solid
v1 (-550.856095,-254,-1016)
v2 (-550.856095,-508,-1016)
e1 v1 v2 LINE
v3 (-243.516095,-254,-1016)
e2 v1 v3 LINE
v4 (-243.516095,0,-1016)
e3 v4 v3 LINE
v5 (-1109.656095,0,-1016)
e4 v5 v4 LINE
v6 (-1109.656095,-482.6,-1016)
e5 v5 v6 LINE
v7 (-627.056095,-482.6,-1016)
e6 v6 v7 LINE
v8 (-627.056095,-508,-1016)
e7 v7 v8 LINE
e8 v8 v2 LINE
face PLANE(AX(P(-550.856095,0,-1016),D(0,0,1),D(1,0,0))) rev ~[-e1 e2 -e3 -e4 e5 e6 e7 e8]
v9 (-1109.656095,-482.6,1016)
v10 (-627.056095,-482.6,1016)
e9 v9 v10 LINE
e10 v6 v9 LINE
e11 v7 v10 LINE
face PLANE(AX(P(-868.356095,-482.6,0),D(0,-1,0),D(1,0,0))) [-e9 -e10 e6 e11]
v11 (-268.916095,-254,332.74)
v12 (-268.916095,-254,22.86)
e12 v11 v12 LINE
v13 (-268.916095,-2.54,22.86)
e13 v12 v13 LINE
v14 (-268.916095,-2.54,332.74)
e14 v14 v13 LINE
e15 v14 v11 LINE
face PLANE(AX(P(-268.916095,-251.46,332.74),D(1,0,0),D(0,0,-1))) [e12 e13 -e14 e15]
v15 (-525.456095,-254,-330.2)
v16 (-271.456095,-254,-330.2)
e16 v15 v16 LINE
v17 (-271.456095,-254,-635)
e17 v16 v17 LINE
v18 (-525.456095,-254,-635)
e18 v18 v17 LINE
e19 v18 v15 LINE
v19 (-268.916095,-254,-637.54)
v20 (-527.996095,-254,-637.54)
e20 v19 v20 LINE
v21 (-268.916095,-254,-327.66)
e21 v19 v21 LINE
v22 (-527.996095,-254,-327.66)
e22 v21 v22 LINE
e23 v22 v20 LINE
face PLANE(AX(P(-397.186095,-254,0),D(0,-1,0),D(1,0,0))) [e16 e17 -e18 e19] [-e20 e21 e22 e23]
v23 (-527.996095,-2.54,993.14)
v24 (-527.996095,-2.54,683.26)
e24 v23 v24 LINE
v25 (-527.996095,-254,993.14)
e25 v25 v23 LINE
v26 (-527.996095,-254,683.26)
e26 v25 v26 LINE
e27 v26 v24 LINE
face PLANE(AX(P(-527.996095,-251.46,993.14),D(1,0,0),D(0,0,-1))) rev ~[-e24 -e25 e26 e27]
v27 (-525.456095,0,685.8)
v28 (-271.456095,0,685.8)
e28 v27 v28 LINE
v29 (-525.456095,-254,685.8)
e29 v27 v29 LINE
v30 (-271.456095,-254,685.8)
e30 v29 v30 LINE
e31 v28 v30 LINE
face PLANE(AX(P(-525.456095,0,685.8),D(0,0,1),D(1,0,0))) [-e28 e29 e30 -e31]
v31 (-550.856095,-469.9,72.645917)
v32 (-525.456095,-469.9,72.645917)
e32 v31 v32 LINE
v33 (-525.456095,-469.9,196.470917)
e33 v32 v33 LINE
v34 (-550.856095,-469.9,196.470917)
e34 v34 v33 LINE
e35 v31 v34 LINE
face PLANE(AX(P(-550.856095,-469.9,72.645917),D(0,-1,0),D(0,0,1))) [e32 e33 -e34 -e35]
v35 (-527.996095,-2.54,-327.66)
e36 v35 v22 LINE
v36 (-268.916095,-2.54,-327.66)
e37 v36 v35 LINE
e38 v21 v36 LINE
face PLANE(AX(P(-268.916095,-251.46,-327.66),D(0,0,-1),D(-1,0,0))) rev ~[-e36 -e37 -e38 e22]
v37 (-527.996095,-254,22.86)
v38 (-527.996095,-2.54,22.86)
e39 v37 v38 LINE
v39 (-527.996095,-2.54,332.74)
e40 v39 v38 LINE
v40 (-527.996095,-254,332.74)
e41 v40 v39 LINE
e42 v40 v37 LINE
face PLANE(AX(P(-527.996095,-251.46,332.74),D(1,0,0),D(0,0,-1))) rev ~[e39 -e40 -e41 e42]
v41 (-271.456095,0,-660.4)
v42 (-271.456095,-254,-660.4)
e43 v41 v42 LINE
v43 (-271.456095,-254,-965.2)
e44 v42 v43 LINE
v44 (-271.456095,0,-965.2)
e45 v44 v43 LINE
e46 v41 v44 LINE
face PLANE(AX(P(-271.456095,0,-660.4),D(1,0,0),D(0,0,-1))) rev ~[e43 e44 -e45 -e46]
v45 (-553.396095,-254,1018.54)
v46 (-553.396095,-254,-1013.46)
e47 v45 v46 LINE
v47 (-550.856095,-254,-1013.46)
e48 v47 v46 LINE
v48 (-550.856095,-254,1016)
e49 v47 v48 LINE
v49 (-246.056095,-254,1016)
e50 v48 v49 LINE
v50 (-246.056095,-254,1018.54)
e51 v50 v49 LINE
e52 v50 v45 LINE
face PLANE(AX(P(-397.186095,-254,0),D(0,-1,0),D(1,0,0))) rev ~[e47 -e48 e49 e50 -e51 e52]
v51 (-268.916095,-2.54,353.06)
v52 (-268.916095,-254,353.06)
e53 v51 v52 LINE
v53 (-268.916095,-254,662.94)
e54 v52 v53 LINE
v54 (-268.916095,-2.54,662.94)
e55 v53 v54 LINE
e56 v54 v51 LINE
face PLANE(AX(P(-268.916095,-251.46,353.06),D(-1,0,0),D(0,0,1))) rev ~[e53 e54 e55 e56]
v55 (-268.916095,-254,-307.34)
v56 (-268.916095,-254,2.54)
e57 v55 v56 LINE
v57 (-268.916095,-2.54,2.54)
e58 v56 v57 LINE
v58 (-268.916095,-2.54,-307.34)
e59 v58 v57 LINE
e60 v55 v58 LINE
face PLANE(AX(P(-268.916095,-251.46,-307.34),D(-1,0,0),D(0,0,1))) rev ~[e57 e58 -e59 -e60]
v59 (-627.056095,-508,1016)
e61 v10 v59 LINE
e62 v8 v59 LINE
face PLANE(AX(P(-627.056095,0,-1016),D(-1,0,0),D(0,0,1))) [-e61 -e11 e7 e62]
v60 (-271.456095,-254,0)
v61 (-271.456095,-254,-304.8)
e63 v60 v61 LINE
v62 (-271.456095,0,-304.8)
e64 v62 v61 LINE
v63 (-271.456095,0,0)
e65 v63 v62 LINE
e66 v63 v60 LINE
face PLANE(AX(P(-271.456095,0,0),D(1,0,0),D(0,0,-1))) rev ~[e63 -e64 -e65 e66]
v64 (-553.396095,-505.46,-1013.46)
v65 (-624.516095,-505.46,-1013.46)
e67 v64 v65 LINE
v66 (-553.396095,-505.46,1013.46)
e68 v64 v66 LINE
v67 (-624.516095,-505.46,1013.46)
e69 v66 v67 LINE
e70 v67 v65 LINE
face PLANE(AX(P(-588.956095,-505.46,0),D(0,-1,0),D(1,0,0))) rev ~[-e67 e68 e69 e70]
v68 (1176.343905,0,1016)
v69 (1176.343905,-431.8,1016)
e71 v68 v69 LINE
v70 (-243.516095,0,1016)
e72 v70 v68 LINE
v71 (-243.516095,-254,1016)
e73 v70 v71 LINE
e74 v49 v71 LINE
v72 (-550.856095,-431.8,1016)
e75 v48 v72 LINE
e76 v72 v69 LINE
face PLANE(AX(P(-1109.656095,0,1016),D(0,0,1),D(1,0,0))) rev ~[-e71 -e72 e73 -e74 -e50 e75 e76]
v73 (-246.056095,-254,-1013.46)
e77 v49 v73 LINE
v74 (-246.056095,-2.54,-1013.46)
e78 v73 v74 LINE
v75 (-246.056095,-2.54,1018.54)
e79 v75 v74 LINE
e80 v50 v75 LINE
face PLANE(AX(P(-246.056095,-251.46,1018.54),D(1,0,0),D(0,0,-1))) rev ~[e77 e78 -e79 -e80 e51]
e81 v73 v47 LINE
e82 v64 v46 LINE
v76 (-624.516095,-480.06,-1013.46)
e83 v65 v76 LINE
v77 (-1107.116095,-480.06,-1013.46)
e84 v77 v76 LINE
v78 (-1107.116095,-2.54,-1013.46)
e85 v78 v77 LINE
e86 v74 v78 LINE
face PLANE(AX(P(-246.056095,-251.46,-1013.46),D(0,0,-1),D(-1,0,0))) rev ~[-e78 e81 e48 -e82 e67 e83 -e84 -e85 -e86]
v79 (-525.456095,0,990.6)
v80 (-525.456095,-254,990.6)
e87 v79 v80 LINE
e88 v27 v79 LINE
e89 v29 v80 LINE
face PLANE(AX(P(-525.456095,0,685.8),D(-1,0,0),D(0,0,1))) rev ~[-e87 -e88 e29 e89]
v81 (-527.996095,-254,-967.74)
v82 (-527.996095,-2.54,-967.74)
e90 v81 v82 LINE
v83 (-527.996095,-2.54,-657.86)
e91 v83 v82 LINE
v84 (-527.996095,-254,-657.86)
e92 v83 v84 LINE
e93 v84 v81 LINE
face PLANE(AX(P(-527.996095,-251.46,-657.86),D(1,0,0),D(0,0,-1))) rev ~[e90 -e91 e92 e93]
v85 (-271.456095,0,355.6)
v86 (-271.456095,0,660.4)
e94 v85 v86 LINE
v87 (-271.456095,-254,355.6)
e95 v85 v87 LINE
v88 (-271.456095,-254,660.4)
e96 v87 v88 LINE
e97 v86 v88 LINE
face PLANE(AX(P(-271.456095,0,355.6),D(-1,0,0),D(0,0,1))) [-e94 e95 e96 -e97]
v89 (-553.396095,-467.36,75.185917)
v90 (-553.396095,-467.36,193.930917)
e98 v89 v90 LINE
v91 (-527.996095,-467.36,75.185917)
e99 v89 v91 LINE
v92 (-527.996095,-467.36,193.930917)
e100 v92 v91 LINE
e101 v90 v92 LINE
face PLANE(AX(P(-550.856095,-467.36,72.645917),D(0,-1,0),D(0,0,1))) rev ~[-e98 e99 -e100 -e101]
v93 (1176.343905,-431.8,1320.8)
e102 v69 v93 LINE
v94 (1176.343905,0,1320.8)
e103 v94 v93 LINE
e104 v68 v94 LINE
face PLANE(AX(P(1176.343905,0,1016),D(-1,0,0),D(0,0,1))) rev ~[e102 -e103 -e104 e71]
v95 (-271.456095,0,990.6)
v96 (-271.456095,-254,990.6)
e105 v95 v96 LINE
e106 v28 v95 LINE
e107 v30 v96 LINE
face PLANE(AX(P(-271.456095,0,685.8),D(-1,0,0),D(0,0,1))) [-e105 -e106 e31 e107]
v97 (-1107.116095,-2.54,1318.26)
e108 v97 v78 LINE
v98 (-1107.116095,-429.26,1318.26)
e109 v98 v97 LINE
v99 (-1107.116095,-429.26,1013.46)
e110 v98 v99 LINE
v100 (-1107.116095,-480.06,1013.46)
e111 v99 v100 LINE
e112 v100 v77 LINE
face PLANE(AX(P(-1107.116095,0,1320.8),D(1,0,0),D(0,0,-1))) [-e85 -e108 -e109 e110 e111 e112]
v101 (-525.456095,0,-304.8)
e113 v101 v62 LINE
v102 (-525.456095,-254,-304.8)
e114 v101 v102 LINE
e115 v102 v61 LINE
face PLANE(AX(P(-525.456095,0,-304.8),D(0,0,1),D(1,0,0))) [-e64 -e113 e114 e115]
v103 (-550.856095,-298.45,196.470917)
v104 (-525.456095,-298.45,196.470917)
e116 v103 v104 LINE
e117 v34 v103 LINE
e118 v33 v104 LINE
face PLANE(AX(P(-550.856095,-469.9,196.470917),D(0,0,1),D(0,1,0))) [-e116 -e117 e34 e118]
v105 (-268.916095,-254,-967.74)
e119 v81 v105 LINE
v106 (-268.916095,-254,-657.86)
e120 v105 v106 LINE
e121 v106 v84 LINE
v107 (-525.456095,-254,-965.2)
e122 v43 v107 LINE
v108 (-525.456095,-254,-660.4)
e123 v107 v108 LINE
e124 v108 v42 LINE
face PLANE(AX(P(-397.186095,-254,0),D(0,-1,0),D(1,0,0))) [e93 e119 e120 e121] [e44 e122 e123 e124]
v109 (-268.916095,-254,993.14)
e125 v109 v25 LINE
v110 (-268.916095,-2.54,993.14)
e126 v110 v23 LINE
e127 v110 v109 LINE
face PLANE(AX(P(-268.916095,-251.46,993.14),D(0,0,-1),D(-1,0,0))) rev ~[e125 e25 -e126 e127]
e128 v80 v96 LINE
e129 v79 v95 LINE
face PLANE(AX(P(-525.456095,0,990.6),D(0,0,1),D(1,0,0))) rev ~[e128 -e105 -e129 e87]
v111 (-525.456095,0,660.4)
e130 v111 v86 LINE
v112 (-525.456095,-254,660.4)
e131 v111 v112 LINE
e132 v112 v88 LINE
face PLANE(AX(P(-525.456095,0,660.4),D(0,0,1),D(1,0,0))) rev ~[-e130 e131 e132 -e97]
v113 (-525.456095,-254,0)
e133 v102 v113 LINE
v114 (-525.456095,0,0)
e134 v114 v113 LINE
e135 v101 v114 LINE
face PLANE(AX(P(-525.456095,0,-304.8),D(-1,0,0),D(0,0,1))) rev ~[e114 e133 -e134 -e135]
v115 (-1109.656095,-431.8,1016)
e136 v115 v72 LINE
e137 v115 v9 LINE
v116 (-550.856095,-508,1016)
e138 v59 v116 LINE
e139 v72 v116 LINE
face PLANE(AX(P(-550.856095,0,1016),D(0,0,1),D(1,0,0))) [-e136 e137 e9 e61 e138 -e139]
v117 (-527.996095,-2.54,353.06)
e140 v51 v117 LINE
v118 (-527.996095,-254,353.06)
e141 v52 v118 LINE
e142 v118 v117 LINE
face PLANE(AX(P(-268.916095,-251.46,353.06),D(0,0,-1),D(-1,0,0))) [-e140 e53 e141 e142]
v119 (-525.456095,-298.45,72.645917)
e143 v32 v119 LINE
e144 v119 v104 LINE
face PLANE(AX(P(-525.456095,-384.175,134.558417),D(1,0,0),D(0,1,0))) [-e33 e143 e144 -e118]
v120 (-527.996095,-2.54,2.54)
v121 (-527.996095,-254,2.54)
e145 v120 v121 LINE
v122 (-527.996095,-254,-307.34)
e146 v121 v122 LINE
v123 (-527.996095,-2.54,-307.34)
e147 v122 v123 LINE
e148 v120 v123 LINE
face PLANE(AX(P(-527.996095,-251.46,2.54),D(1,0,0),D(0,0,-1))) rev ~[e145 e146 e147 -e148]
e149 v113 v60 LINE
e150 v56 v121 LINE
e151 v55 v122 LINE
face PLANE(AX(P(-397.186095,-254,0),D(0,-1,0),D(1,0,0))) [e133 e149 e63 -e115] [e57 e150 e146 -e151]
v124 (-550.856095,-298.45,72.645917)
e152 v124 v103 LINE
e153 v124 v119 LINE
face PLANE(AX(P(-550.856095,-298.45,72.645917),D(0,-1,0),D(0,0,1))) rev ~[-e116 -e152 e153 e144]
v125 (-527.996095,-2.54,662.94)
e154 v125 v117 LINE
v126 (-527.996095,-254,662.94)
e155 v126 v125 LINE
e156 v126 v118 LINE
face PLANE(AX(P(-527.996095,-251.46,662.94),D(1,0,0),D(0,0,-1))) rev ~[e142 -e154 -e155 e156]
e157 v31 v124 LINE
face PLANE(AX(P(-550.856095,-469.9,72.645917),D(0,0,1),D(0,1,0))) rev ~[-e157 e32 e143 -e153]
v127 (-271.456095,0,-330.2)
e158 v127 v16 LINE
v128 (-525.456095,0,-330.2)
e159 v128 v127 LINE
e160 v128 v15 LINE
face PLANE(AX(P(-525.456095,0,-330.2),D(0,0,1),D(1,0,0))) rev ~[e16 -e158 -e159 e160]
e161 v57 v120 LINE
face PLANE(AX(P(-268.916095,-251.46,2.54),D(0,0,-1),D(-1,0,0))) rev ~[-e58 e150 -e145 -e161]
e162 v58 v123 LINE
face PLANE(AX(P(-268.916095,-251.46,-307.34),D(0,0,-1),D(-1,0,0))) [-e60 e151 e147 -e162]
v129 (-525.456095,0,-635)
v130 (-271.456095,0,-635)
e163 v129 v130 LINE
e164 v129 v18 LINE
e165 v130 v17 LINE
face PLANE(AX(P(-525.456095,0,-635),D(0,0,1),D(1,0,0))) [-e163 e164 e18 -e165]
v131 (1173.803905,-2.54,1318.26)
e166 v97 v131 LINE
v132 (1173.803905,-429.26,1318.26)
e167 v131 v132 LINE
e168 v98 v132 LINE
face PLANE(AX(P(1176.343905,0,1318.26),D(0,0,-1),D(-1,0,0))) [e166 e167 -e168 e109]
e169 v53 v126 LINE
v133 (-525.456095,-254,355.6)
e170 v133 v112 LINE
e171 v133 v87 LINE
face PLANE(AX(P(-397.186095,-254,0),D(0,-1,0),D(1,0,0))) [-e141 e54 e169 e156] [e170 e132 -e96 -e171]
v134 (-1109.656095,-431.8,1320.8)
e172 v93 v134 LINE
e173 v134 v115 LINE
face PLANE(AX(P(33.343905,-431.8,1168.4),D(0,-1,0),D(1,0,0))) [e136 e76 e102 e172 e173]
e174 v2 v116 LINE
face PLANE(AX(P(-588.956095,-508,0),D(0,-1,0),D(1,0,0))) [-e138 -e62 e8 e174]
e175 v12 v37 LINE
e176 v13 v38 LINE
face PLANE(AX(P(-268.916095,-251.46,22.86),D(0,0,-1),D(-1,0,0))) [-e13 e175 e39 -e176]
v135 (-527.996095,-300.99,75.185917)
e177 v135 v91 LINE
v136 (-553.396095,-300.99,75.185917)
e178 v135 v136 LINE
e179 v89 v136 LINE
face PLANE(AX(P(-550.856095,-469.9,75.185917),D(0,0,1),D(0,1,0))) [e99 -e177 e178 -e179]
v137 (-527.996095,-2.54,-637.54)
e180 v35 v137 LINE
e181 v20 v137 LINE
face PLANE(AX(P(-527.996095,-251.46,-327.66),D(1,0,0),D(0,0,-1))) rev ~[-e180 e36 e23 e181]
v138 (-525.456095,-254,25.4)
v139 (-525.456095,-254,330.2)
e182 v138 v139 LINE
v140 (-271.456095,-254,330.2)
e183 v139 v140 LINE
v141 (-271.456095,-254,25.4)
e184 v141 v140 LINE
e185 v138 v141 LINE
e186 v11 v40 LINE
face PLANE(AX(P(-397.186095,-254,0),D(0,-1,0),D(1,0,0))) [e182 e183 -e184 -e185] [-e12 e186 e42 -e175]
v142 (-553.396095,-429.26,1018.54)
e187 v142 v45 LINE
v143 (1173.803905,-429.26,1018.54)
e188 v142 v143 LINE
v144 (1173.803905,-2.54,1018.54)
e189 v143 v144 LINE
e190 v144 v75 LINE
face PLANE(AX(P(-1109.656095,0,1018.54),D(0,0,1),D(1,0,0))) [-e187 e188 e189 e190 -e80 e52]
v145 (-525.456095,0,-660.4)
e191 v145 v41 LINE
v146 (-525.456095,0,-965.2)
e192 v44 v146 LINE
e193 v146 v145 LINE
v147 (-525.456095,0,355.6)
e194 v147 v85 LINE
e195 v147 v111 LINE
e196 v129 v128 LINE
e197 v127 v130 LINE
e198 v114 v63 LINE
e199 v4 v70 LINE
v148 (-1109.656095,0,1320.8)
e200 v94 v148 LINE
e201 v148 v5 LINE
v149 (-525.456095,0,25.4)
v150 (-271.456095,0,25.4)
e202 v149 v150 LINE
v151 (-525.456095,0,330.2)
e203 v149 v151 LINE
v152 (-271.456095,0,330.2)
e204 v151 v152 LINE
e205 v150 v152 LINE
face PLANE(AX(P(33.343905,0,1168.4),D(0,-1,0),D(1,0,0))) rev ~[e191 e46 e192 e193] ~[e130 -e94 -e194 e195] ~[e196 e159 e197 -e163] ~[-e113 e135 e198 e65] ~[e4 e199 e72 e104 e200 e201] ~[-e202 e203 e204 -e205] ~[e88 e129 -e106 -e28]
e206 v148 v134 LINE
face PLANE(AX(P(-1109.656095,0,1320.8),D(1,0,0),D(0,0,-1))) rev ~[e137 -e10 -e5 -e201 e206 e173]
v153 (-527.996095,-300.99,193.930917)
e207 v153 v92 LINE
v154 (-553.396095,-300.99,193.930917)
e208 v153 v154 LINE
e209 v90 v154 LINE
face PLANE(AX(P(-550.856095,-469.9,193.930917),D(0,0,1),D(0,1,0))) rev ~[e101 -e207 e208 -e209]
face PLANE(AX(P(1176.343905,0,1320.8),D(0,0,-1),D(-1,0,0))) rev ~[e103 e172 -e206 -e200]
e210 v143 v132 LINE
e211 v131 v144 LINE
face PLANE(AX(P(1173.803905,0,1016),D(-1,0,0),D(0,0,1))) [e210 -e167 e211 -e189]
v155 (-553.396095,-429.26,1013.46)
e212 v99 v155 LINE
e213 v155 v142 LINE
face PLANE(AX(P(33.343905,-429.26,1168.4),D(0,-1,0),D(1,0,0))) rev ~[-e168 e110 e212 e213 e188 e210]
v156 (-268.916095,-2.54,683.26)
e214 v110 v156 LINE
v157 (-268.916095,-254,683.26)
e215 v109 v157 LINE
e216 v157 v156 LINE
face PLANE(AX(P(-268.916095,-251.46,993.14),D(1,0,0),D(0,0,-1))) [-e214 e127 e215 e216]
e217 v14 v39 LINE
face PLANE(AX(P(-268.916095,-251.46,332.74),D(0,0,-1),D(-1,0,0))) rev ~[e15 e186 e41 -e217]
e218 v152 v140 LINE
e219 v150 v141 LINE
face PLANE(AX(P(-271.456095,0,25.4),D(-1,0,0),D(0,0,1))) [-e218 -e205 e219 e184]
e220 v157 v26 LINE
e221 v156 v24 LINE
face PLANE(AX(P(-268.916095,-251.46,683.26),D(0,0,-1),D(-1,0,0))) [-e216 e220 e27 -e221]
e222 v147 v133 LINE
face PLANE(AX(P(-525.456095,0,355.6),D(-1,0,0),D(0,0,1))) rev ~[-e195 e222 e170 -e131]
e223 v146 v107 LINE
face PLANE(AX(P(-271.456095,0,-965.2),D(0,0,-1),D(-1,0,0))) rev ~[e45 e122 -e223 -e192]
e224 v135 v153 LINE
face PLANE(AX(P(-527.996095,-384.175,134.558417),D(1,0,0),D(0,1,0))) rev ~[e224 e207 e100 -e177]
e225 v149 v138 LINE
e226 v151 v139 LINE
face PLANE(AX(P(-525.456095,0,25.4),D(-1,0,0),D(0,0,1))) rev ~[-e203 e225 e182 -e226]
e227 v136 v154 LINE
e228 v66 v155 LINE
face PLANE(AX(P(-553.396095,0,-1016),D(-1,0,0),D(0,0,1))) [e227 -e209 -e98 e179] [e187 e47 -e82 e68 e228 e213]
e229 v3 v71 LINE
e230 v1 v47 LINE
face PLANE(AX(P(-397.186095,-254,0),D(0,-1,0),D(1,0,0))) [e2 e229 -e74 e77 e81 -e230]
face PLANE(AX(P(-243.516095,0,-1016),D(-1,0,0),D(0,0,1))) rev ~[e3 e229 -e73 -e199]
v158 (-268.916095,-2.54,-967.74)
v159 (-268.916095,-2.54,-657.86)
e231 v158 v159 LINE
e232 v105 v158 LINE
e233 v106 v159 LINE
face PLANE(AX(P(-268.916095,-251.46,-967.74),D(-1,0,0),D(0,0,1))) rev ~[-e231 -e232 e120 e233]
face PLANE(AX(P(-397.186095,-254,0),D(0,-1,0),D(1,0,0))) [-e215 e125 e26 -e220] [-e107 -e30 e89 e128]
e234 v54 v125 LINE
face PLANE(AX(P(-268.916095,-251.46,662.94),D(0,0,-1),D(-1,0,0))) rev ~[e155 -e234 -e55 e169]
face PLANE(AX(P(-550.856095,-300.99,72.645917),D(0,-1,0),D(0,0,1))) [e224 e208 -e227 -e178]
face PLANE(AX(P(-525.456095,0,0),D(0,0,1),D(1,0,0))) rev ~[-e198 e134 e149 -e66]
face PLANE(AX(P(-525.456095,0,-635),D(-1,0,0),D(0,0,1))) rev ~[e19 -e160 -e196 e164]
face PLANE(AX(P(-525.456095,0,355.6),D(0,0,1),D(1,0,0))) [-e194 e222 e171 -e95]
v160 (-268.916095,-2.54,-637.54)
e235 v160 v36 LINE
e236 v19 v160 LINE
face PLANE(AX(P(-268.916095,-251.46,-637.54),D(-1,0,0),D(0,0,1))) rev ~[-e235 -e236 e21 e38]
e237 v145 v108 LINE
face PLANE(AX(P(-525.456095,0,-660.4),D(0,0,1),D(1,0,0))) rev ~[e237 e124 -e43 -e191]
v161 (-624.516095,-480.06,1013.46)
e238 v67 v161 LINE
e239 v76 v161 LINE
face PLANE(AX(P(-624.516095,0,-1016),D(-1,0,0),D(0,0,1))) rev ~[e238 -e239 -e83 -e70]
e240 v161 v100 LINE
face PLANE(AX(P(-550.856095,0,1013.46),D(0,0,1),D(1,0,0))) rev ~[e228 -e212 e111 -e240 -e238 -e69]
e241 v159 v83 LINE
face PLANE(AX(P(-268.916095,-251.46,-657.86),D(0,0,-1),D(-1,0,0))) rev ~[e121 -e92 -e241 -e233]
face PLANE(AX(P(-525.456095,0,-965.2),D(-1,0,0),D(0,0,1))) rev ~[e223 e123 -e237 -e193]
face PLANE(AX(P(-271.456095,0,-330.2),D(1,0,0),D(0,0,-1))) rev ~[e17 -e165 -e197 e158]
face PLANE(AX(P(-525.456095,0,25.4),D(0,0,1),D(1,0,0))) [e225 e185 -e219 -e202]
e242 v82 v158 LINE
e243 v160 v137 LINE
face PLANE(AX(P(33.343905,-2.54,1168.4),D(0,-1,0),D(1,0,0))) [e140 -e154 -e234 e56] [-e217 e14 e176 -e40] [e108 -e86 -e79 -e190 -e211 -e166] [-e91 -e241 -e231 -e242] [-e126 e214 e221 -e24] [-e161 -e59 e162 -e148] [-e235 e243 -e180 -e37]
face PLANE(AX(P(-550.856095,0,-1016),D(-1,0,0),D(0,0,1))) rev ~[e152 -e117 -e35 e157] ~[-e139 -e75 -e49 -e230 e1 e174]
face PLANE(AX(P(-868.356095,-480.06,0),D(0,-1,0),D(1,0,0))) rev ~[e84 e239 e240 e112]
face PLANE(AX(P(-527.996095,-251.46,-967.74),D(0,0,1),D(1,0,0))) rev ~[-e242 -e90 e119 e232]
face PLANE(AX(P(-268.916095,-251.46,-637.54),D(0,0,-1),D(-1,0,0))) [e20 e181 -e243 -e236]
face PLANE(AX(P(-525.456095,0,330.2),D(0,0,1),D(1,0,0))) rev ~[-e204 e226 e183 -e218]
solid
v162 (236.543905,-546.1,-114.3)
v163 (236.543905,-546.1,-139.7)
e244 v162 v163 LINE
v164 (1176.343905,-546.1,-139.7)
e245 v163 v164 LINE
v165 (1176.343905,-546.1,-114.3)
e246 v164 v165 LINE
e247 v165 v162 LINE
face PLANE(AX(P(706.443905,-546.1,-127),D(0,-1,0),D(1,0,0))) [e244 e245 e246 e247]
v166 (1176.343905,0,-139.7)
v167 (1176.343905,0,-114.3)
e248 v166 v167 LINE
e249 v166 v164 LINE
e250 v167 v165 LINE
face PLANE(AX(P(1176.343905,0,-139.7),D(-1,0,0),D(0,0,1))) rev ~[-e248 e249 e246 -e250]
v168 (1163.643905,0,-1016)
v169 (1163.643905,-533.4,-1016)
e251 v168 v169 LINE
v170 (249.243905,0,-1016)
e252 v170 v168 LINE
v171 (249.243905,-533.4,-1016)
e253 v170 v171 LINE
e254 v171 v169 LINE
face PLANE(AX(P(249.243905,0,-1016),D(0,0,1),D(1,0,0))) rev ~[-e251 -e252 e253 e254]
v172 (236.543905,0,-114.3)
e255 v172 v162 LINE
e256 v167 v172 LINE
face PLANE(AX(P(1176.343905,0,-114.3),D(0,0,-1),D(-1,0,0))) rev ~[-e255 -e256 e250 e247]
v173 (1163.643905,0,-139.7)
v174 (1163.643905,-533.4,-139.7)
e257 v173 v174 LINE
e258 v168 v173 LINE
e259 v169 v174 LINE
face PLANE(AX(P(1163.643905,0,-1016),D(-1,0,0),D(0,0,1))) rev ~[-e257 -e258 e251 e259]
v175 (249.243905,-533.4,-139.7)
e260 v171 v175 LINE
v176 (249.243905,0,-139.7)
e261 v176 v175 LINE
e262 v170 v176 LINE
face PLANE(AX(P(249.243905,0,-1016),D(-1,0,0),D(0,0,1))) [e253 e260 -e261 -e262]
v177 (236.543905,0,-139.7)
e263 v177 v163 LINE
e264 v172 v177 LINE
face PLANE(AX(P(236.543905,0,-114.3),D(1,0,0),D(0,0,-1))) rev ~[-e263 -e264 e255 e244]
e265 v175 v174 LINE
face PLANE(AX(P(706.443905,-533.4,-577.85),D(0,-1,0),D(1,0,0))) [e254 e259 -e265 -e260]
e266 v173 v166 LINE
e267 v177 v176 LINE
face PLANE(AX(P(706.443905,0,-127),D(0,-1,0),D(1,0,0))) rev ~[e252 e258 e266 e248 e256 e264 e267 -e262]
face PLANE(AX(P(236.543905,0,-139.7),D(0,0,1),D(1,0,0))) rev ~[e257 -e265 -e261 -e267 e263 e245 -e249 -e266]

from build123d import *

# Parameters (mm, degrees)
F1_DEPTH = 546.1
F0_W     = 914.4
F0_H     = 876.3
F2_DEPTH = 533.4
F0_W_2   = 482.6
F0_H_2   = 2032
F3_DEPTH = 482.6
F0_W_3   = 76.2
F4_DEPTH = 508
F5_W     = 171.45
F5_H     = 123.825
F6_DEPTH = 25.4
F0_W_4   = 307.34
F0_W_5   = 254
F0_H_3   = 304.8
F0_H_4   = 25.4
F7_DEPTH = 254
F8_DEPTH = 431.8
F9_T     = -2.54


# Not quite as in the source:
# - a shell that OpenCascade refuses in one call is made with other operations: the cavity is built on its own and cut out
# - the program builds the solid bodies; features that only make, move or delete a surface that nothing else refers to are left out


with BuildPart() as f1:
    # F0 (on Front) → F1 (new body)
    with BuildSketch(Plane.XZ):
        Polygon((236.5439048201, -139.7), (249.2439048201, -139.7), (1163.6439048201, -139.7), (1176.3439048201, -139.7), (1176.3439048201, -114.3), (236.5439048201, -114.3), align=None)
    extrude(amount=F1_DEPTH)

    # F0 (on Front) → F2 (join)
    with BuildSketch(Plane.XZ):
        with Locations((706.4439048201, -577.85)):
            Rectangle(F0_W, F0_H)
    extrude(amount=F2_DEPTH)


with BuildPart() as f3:
    # F0 (on Front) → F3 (new body)
    with BuildSketch(Plane.XZ):
        with Locations((-868.3560951799, 0)):
            Rectangle(F0_W_2, F0_H_2)
    extrude(amount=F3_DEPTH)

    # F0 (on Front) → F4 (join)
    with BuildSketch(Plane.XZ):
        with Locations((-588.9560951799, 0)):
            Rectangle(F0_W_3, F0_H_2)
    extrude(amount=F4_DEPTH)

    # F5 (on face) → F6 (join)
    with BuildSketch(Plane.YZ.offset(-550.8560951799)):
        with Locations((-384.175, 134.5584170843)):
            Rectangle(F5_W, F5_H)
    extrude(amount=F6_DEPTH)

    # F0 (on Front) → F7 (join)
    with BuildSketch(Plane.XZ):
        with Locations((-397.1860951799, 0)):
            Rectangle(F0_W_4, F0_H_2)
        Polygon((-525.4560951799, -304.8), (-525.4560951799, 0), (-271.4560951799, 0), (-271.4560951799, -304.8), (-271.4560951799, -330.2), (-271.4560951799, -635), (-271.4560951799, -660.4), (-271.4560951799, -965.2), (-525.4560951799, -965.2), (-525.4560951799, -660.4), (-525.4560951799, -635), (-525.4560951799, -330.2), align=None, mode=Mode.SUBTRACT)
        with Locations((-398.4560951799, 177.8)):
            Rectangle(F0_W_5, F0_H_3, mode=Mode.SUBTRACT)
        with Locations((-398.4560951799, 508)):
            Rectangle(F0_W_5, F0_H_3, mode=Mode.SUBTRACT)
        with Locations((-398.4560951799, 838.2)):
            Rectangle(F0_W_5, F0_H_3, mode=Mode.SUBTRACT)
        with Locations((-398.4560951799, -317.5)):
            Rectangle(F0_W_5, F0_H_4)
        with Locations((-398.4560951799, -647.7)):
            Rectangle(F0_W_5, F0_H_4)
    extrude(amount=F7_DEPTH)

    # F0 (on Front) → F8 (join)
    with BuildSketch(Plane.XZ):
        Polygon((-1109.6560951799, 1320.8), (-1109.6560951799, 1016), (-627.0560951799, 1016), (-550.8560951799, 1016), (-243.5160951799, 1016), (1176.3439048201, 1016), (1176.3439048201, 1320.8), align=None)
    extrude(amount=F8_DEPTH)

    # F9: a shell. OpenCascade refuses it in one call, so the cavity is built on its own and cut out:
    # the body offset inwards by the wall thickness, plus a prism from it out through each open face.
    f9_core = offset(f3.part, amount=F9_T, kind=Kind.INTERSECTION, mode=Mode.PRIVATE)
    f9_exits = [f9_core.faces().sort_by_distance(p)[0] for p in [
        (-399.726095, -251.46, 997.988888),
    ]]
    add(f9_core, mode=Mode.SUBTRACT)
    extrude(f9_exits, amount=-F9_T, mode=Mode.SUBTRACT)


solid = Compound([f1.part, f3.part])
